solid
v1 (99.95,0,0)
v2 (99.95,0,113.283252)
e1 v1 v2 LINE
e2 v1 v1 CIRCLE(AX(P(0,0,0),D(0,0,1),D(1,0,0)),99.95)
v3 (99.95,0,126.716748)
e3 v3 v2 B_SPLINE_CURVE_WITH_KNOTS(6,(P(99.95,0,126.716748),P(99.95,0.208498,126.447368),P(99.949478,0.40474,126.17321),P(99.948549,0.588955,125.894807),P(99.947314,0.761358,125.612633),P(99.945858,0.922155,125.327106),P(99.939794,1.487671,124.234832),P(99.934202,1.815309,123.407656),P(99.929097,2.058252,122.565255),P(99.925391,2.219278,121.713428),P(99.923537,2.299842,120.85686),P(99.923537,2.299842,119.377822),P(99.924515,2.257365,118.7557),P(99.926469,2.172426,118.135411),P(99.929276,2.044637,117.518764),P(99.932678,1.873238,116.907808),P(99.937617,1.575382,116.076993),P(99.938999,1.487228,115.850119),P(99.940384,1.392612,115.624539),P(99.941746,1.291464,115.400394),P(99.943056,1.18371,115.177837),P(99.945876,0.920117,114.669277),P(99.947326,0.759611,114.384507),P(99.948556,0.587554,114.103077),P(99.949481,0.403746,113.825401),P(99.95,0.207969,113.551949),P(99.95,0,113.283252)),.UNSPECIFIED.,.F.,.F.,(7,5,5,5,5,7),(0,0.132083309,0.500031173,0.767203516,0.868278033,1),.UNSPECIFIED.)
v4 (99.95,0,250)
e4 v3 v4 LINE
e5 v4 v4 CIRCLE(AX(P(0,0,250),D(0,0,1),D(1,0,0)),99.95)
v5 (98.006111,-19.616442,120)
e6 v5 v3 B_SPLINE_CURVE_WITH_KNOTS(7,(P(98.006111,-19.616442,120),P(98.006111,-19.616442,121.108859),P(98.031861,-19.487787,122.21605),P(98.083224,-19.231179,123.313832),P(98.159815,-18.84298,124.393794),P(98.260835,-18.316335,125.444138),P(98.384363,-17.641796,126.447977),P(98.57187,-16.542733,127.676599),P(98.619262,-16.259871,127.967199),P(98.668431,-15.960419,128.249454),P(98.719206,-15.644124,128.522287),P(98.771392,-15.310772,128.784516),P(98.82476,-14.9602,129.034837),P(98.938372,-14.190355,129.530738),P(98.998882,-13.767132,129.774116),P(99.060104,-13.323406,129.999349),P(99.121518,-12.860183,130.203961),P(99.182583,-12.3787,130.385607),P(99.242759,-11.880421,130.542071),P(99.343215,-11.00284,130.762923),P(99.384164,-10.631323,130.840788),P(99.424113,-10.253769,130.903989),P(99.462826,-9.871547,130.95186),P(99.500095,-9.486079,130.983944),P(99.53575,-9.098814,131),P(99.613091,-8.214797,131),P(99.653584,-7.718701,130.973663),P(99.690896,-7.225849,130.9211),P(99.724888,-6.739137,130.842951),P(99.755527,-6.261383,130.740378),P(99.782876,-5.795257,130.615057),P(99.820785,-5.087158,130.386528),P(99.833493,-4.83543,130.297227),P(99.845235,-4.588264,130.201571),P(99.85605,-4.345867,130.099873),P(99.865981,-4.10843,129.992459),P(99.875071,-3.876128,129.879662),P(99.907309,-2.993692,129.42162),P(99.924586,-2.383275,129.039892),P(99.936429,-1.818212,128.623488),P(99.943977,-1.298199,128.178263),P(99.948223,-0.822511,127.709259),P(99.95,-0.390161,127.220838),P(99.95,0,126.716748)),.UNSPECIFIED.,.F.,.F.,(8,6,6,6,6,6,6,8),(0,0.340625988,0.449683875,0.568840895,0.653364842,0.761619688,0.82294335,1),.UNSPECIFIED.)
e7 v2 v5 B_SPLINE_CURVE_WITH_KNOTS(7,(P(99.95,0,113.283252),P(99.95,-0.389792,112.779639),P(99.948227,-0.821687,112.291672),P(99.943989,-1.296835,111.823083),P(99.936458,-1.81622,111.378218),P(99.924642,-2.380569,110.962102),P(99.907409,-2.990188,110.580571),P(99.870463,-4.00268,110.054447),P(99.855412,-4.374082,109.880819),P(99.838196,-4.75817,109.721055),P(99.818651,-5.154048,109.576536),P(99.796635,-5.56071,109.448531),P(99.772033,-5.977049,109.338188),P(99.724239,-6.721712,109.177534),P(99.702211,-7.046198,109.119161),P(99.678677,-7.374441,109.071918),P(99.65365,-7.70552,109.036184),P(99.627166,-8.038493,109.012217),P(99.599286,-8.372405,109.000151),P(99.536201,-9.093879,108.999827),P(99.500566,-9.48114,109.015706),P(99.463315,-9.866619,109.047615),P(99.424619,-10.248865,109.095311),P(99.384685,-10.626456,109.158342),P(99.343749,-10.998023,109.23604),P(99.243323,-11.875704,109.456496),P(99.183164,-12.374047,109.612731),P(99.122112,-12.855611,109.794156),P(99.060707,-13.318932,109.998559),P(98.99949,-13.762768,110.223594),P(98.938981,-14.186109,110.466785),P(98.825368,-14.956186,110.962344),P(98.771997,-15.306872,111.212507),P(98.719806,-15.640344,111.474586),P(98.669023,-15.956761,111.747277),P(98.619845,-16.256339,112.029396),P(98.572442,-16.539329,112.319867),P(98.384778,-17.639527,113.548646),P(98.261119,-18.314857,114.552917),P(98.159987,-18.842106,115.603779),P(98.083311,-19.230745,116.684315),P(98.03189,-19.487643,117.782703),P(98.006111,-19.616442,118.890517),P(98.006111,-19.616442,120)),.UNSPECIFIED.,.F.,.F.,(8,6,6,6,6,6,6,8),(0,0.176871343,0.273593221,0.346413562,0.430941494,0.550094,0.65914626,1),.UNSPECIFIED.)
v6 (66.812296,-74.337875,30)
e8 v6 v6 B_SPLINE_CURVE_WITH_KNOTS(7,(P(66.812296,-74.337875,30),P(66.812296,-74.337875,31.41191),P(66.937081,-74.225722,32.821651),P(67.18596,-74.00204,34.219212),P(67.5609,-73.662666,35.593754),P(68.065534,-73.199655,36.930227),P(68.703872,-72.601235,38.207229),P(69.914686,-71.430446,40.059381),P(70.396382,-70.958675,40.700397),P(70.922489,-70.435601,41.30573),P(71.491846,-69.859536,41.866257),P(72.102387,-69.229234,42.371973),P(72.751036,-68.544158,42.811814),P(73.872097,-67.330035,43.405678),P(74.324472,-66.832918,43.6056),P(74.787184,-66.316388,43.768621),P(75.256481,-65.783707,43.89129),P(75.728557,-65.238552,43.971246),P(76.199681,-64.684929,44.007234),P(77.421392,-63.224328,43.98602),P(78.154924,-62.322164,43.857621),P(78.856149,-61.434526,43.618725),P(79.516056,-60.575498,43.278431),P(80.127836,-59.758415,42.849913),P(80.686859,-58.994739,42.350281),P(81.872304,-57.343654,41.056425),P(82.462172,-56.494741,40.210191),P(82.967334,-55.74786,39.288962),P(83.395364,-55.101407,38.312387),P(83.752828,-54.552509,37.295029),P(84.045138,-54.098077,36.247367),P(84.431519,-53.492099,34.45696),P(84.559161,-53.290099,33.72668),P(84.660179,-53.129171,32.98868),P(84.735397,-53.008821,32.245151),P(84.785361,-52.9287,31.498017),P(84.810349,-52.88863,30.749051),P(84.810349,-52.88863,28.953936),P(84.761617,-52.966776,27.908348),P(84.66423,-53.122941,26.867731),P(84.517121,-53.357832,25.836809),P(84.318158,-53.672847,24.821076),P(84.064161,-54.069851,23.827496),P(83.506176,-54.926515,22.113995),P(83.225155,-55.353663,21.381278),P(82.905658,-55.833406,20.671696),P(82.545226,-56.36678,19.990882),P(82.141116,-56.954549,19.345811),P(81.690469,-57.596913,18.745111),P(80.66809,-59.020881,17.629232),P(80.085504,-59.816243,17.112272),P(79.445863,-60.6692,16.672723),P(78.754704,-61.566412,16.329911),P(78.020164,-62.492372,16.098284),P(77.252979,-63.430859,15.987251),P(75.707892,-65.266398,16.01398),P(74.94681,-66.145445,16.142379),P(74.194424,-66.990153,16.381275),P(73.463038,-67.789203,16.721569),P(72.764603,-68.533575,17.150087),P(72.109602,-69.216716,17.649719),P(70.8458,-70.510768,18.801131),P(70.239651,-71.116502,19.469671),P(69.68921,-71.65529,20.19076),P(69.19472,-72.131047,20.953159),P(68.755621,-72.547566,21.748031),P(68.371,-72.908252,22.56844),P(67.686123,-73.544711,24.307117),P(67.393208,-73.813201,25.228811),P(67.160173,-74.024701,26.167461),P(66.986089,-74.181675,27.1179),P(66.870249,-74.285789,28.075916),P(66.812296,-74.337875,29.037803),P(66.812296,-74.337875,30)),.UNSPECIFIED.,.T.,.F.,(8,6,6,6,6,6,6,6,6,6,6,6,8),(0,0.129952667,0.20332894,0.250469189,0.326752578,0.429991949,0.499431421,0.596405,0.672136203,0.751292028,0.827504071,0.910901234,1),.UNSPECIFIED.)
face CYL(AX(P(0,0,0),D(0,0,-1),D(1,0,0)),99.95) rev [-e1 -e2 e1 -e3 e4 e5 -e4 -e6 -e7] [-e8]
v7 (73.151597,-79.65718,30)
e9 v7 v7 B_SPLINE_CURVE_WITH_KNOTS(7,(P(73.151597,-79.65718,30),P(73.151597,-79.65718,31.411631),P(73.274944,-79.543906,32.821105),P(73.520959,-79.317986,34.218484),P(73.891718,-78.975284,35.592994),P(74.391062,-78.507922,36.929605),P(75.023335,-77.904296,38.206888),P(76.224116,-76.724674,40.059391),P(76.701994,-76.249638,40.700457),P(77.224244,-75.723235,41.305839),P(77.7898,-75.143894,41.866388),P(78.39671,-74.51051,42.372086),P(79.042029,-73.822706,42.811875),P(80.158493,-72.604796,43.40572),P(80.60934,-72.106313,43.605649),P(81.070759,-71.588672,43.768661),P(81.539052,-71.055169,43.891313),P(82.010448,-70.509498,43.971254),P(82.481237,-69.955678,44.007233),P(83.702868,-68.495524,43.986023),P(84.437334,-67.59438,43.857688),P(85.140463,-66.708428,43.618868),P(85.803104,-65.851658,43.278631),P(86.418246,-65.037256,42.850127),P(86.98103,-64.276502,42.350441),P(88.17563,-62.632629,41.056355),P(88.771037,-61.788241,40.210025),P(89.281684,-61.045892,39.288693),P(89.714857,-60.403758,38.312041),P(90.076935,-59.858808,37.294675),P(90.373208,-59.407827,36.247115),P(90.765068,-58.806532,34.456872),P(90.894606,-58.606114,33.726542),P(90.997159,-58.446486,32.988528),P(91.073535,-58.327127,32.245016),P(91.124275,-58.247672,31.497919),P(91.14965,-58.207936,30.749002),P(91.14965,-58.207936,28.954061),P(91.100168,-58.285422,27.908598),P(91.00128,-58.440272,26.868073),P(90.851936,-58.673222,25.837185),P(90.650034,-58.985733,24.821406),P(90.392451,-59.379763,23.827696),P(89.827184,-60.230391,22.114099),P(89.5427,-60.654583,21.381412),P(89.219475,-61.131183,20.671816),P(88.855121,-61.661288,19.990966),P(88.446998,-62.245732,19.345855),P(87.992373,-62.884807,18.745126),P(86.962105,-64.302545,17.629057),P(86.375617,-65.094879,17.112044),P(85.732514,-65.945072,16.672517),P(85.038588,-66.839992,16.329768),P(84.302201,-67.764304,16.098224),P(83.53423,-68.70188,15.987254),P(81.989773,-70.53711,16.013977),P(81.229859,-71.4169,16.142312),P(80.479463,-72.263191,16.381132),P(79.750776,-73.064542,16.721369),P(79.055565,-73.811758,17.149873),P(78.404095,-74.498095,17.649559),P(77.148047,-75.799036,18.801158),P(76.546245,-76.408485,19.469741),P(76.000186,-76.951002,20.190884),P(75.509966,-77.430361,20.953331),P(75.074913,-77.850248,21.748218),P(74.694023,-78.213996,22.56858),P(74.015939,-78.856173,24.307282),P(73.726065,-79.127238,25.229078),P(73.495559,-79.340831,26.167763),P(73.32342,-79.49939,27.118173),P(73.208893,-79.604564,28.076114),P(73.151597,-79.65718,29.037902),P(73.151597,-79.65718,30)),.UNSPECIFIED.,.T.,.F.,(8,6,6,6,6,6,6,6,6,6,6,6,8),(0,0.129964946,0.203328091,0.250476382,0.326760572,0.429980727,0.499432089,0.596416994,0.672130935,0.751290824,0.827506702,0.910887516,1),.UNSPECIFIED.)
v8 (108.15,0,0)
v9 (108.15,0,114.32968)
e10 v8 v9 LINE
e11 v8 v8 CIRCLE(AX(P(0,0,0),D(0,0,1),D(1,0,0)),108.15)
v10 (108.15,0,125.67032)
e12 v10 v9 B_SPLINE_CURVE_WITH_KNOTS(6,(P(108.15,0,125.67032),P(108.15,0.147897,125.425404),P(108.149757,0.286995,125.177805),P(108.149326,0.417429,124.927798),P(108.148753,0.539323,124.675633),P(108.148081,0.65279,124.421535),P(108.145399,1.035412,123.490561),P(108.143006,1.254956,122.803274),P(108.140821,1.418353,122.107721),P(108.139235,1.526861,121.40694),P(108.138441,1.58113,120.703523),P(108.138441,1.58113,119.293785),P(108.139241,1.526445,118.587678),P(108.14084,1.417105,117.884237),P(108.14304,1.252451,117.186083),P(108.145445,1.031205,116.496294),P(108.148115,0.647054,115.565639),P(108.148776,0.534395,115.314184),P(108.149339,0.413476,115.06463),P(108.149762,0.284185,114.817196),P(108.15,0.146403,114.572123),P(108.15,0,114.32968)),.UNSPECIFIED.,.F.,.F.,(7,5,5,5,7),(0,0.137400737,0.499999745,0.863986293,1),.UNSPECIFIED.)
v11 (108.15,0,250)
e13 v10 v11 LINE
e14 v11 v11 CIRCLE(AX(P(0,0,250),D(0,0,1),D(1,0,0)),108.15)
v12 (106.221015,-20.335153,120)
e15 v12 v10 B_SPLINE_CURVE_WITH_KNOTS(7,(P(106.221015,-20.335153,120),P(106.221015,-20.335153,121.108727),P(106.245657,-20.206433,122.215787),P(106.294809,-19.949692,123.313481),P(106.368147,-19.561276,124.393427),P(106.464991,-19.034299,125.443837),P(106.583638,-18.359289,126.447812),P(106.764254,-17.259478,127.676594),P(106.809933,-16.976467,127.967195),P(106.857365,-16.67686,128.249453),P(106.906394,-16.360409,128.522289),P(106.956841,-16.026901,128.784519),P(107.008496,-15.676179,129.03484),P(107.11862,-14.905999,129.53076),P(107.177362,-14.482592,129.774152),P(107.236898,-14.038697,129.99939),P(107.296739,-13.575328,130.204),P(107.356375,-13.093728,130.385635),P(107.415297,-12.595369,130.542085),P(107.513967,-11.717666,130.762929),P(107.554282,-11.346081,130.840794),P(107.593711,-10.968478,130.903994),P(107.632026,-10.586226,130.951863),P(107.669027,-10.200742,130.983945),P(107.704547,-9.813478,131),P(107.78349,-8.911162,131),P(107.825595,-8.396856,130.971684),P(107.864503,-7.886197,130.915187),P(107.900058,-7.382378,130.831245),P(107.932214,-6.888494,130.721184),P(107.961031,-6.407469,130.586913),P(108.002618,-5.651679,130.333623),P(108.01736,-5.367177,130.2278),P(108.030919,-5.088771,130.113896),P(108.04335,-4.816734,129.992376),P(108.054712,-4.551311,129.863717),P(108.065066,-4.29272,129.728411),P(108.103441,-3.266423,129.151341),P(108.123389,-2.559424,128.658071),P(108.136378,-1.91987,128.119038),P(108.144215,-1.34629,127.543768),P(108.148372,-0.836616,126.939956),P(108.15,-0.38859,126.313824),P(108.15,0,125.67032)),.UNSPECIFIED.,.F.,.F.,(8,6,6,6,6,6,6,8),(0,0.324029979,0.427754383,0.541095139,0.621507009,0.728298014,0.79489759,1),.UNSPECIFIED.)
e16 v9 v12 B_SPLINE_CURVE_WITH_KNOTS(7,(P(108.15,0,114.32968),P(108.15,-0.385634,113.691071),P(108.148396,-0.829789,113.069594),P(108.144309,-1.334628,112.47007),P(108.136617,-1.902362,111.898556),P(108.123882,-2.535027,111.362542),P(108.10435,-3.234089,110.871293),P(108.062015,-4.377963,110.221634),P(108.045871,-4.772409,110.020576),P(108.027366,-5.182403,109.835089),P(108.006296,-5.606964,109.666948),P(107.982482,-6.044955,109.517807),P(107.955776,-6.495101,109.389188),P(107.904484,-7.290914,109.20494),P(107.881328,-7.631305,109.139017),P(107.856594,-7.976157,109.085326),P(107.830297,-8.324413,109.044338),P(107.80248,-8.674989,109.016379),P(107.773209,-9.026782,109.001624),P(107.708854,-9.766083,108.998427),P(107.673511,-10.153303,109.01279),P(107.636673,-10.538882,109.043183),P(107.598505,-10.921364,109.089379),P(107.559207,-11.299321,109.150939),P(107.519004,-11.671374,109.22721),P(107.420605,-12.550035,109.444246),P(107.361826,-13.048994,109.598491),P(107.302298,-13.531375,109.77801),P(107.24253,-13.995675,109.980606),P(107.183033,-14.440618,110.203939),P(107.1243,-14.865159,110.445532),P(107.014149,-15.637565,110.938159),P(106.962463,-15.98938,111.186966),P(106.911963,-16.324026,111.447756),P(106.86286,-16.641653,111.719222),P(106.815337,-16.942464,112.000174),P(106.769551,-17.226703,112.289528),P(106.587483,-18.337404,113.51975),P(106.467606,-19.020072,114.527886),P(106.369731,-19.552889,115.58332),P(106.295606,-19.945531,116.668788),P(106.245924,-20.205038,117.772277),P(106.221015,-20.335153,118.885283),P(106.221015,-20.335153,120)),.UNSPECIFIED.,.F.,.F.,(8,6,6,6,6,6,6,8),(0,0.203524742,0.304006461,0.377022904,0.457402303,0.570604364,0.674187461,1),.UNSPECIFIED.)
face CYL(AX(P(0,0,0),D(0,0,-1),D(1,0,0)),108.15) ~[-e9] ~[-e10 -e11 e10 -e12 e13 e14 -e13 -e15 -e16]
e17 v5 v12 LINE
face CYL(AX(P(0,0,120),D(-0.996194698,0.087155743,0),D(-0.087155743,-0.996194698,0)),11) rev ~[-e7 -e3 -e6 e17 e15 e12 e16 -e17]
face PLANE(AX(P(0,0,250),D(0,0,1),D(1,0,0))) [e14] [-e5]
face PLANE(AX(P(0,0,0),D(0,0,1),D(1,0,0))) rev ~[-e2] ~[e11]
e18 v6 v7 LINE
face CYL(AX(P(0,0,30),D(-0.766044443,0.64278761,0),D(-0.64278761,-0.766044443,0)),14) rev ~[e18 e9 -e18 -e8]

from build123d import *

# Parameters (mm, degrees)
F0_R     = 108.15
F0_R_2   = 99.95
F1_DEPTH = 250
F3_R     = 14
F4_REACH = 191.9641662574
F6_R     = 11
F7_REACH = 148.2780486573


with BuildPart() as f1:
    # F0 (on Top) → F1 (new body)
    with BuildSketch(Plane.XY):
        Circle(F0_R)
        Circle(F0_R_2, mode=Mode.SUBTRACT)
    extrude(amount=F1_DEPTH)

    f4_end = f1.faces().sort_by_distance((-108.15, 0, 125))[0]
    # F3 (on face) → F4 (cut, up to a face of the model that its end follows)
    with BuildSketch(Plane(origin=(0, 0, 0), x_dir=(-0.6427876097, -0.7660444431, 0), z_dir=(-0.7660444431, 0.6427876097, 0))):
        with Locations((0, 30)):
            Circle(F3_R)
    f4_long = extrude(amount=-F4_REACH, mode=Mode.PRIVATE)
    add(split(f4_long, bisect_by=f4_end, keep=Keep.BOTTOM, mode=Mode.PRIVATE), mode=Mode.SUBTRACT)

    f7_end = f1.faces().sort_by_distance((-108.15, 0, 125))[0]
    # F6 (on face) → F7 (cut, up to a face of the model that its end follows)
    with BuildSketch(Plane(origin=(0, 0, 0), x_dir=(-0.0871557427, -0.9961946981, 0), z_dir=(-0.9961946981, 0.0871557427, 0))):
        with Locations((0, 120)):
            Circle(F6_R)
    f7_long = extrude(amount=-F7_REACH, mode=Mode.PRIVATE)
    add(split(f7_long, bisect_by=f7_end, keep=Keep.BOTTOM, mode=Mode.PRIVATE), mode=Mode.SUBTRACT)


solid = f1.part
